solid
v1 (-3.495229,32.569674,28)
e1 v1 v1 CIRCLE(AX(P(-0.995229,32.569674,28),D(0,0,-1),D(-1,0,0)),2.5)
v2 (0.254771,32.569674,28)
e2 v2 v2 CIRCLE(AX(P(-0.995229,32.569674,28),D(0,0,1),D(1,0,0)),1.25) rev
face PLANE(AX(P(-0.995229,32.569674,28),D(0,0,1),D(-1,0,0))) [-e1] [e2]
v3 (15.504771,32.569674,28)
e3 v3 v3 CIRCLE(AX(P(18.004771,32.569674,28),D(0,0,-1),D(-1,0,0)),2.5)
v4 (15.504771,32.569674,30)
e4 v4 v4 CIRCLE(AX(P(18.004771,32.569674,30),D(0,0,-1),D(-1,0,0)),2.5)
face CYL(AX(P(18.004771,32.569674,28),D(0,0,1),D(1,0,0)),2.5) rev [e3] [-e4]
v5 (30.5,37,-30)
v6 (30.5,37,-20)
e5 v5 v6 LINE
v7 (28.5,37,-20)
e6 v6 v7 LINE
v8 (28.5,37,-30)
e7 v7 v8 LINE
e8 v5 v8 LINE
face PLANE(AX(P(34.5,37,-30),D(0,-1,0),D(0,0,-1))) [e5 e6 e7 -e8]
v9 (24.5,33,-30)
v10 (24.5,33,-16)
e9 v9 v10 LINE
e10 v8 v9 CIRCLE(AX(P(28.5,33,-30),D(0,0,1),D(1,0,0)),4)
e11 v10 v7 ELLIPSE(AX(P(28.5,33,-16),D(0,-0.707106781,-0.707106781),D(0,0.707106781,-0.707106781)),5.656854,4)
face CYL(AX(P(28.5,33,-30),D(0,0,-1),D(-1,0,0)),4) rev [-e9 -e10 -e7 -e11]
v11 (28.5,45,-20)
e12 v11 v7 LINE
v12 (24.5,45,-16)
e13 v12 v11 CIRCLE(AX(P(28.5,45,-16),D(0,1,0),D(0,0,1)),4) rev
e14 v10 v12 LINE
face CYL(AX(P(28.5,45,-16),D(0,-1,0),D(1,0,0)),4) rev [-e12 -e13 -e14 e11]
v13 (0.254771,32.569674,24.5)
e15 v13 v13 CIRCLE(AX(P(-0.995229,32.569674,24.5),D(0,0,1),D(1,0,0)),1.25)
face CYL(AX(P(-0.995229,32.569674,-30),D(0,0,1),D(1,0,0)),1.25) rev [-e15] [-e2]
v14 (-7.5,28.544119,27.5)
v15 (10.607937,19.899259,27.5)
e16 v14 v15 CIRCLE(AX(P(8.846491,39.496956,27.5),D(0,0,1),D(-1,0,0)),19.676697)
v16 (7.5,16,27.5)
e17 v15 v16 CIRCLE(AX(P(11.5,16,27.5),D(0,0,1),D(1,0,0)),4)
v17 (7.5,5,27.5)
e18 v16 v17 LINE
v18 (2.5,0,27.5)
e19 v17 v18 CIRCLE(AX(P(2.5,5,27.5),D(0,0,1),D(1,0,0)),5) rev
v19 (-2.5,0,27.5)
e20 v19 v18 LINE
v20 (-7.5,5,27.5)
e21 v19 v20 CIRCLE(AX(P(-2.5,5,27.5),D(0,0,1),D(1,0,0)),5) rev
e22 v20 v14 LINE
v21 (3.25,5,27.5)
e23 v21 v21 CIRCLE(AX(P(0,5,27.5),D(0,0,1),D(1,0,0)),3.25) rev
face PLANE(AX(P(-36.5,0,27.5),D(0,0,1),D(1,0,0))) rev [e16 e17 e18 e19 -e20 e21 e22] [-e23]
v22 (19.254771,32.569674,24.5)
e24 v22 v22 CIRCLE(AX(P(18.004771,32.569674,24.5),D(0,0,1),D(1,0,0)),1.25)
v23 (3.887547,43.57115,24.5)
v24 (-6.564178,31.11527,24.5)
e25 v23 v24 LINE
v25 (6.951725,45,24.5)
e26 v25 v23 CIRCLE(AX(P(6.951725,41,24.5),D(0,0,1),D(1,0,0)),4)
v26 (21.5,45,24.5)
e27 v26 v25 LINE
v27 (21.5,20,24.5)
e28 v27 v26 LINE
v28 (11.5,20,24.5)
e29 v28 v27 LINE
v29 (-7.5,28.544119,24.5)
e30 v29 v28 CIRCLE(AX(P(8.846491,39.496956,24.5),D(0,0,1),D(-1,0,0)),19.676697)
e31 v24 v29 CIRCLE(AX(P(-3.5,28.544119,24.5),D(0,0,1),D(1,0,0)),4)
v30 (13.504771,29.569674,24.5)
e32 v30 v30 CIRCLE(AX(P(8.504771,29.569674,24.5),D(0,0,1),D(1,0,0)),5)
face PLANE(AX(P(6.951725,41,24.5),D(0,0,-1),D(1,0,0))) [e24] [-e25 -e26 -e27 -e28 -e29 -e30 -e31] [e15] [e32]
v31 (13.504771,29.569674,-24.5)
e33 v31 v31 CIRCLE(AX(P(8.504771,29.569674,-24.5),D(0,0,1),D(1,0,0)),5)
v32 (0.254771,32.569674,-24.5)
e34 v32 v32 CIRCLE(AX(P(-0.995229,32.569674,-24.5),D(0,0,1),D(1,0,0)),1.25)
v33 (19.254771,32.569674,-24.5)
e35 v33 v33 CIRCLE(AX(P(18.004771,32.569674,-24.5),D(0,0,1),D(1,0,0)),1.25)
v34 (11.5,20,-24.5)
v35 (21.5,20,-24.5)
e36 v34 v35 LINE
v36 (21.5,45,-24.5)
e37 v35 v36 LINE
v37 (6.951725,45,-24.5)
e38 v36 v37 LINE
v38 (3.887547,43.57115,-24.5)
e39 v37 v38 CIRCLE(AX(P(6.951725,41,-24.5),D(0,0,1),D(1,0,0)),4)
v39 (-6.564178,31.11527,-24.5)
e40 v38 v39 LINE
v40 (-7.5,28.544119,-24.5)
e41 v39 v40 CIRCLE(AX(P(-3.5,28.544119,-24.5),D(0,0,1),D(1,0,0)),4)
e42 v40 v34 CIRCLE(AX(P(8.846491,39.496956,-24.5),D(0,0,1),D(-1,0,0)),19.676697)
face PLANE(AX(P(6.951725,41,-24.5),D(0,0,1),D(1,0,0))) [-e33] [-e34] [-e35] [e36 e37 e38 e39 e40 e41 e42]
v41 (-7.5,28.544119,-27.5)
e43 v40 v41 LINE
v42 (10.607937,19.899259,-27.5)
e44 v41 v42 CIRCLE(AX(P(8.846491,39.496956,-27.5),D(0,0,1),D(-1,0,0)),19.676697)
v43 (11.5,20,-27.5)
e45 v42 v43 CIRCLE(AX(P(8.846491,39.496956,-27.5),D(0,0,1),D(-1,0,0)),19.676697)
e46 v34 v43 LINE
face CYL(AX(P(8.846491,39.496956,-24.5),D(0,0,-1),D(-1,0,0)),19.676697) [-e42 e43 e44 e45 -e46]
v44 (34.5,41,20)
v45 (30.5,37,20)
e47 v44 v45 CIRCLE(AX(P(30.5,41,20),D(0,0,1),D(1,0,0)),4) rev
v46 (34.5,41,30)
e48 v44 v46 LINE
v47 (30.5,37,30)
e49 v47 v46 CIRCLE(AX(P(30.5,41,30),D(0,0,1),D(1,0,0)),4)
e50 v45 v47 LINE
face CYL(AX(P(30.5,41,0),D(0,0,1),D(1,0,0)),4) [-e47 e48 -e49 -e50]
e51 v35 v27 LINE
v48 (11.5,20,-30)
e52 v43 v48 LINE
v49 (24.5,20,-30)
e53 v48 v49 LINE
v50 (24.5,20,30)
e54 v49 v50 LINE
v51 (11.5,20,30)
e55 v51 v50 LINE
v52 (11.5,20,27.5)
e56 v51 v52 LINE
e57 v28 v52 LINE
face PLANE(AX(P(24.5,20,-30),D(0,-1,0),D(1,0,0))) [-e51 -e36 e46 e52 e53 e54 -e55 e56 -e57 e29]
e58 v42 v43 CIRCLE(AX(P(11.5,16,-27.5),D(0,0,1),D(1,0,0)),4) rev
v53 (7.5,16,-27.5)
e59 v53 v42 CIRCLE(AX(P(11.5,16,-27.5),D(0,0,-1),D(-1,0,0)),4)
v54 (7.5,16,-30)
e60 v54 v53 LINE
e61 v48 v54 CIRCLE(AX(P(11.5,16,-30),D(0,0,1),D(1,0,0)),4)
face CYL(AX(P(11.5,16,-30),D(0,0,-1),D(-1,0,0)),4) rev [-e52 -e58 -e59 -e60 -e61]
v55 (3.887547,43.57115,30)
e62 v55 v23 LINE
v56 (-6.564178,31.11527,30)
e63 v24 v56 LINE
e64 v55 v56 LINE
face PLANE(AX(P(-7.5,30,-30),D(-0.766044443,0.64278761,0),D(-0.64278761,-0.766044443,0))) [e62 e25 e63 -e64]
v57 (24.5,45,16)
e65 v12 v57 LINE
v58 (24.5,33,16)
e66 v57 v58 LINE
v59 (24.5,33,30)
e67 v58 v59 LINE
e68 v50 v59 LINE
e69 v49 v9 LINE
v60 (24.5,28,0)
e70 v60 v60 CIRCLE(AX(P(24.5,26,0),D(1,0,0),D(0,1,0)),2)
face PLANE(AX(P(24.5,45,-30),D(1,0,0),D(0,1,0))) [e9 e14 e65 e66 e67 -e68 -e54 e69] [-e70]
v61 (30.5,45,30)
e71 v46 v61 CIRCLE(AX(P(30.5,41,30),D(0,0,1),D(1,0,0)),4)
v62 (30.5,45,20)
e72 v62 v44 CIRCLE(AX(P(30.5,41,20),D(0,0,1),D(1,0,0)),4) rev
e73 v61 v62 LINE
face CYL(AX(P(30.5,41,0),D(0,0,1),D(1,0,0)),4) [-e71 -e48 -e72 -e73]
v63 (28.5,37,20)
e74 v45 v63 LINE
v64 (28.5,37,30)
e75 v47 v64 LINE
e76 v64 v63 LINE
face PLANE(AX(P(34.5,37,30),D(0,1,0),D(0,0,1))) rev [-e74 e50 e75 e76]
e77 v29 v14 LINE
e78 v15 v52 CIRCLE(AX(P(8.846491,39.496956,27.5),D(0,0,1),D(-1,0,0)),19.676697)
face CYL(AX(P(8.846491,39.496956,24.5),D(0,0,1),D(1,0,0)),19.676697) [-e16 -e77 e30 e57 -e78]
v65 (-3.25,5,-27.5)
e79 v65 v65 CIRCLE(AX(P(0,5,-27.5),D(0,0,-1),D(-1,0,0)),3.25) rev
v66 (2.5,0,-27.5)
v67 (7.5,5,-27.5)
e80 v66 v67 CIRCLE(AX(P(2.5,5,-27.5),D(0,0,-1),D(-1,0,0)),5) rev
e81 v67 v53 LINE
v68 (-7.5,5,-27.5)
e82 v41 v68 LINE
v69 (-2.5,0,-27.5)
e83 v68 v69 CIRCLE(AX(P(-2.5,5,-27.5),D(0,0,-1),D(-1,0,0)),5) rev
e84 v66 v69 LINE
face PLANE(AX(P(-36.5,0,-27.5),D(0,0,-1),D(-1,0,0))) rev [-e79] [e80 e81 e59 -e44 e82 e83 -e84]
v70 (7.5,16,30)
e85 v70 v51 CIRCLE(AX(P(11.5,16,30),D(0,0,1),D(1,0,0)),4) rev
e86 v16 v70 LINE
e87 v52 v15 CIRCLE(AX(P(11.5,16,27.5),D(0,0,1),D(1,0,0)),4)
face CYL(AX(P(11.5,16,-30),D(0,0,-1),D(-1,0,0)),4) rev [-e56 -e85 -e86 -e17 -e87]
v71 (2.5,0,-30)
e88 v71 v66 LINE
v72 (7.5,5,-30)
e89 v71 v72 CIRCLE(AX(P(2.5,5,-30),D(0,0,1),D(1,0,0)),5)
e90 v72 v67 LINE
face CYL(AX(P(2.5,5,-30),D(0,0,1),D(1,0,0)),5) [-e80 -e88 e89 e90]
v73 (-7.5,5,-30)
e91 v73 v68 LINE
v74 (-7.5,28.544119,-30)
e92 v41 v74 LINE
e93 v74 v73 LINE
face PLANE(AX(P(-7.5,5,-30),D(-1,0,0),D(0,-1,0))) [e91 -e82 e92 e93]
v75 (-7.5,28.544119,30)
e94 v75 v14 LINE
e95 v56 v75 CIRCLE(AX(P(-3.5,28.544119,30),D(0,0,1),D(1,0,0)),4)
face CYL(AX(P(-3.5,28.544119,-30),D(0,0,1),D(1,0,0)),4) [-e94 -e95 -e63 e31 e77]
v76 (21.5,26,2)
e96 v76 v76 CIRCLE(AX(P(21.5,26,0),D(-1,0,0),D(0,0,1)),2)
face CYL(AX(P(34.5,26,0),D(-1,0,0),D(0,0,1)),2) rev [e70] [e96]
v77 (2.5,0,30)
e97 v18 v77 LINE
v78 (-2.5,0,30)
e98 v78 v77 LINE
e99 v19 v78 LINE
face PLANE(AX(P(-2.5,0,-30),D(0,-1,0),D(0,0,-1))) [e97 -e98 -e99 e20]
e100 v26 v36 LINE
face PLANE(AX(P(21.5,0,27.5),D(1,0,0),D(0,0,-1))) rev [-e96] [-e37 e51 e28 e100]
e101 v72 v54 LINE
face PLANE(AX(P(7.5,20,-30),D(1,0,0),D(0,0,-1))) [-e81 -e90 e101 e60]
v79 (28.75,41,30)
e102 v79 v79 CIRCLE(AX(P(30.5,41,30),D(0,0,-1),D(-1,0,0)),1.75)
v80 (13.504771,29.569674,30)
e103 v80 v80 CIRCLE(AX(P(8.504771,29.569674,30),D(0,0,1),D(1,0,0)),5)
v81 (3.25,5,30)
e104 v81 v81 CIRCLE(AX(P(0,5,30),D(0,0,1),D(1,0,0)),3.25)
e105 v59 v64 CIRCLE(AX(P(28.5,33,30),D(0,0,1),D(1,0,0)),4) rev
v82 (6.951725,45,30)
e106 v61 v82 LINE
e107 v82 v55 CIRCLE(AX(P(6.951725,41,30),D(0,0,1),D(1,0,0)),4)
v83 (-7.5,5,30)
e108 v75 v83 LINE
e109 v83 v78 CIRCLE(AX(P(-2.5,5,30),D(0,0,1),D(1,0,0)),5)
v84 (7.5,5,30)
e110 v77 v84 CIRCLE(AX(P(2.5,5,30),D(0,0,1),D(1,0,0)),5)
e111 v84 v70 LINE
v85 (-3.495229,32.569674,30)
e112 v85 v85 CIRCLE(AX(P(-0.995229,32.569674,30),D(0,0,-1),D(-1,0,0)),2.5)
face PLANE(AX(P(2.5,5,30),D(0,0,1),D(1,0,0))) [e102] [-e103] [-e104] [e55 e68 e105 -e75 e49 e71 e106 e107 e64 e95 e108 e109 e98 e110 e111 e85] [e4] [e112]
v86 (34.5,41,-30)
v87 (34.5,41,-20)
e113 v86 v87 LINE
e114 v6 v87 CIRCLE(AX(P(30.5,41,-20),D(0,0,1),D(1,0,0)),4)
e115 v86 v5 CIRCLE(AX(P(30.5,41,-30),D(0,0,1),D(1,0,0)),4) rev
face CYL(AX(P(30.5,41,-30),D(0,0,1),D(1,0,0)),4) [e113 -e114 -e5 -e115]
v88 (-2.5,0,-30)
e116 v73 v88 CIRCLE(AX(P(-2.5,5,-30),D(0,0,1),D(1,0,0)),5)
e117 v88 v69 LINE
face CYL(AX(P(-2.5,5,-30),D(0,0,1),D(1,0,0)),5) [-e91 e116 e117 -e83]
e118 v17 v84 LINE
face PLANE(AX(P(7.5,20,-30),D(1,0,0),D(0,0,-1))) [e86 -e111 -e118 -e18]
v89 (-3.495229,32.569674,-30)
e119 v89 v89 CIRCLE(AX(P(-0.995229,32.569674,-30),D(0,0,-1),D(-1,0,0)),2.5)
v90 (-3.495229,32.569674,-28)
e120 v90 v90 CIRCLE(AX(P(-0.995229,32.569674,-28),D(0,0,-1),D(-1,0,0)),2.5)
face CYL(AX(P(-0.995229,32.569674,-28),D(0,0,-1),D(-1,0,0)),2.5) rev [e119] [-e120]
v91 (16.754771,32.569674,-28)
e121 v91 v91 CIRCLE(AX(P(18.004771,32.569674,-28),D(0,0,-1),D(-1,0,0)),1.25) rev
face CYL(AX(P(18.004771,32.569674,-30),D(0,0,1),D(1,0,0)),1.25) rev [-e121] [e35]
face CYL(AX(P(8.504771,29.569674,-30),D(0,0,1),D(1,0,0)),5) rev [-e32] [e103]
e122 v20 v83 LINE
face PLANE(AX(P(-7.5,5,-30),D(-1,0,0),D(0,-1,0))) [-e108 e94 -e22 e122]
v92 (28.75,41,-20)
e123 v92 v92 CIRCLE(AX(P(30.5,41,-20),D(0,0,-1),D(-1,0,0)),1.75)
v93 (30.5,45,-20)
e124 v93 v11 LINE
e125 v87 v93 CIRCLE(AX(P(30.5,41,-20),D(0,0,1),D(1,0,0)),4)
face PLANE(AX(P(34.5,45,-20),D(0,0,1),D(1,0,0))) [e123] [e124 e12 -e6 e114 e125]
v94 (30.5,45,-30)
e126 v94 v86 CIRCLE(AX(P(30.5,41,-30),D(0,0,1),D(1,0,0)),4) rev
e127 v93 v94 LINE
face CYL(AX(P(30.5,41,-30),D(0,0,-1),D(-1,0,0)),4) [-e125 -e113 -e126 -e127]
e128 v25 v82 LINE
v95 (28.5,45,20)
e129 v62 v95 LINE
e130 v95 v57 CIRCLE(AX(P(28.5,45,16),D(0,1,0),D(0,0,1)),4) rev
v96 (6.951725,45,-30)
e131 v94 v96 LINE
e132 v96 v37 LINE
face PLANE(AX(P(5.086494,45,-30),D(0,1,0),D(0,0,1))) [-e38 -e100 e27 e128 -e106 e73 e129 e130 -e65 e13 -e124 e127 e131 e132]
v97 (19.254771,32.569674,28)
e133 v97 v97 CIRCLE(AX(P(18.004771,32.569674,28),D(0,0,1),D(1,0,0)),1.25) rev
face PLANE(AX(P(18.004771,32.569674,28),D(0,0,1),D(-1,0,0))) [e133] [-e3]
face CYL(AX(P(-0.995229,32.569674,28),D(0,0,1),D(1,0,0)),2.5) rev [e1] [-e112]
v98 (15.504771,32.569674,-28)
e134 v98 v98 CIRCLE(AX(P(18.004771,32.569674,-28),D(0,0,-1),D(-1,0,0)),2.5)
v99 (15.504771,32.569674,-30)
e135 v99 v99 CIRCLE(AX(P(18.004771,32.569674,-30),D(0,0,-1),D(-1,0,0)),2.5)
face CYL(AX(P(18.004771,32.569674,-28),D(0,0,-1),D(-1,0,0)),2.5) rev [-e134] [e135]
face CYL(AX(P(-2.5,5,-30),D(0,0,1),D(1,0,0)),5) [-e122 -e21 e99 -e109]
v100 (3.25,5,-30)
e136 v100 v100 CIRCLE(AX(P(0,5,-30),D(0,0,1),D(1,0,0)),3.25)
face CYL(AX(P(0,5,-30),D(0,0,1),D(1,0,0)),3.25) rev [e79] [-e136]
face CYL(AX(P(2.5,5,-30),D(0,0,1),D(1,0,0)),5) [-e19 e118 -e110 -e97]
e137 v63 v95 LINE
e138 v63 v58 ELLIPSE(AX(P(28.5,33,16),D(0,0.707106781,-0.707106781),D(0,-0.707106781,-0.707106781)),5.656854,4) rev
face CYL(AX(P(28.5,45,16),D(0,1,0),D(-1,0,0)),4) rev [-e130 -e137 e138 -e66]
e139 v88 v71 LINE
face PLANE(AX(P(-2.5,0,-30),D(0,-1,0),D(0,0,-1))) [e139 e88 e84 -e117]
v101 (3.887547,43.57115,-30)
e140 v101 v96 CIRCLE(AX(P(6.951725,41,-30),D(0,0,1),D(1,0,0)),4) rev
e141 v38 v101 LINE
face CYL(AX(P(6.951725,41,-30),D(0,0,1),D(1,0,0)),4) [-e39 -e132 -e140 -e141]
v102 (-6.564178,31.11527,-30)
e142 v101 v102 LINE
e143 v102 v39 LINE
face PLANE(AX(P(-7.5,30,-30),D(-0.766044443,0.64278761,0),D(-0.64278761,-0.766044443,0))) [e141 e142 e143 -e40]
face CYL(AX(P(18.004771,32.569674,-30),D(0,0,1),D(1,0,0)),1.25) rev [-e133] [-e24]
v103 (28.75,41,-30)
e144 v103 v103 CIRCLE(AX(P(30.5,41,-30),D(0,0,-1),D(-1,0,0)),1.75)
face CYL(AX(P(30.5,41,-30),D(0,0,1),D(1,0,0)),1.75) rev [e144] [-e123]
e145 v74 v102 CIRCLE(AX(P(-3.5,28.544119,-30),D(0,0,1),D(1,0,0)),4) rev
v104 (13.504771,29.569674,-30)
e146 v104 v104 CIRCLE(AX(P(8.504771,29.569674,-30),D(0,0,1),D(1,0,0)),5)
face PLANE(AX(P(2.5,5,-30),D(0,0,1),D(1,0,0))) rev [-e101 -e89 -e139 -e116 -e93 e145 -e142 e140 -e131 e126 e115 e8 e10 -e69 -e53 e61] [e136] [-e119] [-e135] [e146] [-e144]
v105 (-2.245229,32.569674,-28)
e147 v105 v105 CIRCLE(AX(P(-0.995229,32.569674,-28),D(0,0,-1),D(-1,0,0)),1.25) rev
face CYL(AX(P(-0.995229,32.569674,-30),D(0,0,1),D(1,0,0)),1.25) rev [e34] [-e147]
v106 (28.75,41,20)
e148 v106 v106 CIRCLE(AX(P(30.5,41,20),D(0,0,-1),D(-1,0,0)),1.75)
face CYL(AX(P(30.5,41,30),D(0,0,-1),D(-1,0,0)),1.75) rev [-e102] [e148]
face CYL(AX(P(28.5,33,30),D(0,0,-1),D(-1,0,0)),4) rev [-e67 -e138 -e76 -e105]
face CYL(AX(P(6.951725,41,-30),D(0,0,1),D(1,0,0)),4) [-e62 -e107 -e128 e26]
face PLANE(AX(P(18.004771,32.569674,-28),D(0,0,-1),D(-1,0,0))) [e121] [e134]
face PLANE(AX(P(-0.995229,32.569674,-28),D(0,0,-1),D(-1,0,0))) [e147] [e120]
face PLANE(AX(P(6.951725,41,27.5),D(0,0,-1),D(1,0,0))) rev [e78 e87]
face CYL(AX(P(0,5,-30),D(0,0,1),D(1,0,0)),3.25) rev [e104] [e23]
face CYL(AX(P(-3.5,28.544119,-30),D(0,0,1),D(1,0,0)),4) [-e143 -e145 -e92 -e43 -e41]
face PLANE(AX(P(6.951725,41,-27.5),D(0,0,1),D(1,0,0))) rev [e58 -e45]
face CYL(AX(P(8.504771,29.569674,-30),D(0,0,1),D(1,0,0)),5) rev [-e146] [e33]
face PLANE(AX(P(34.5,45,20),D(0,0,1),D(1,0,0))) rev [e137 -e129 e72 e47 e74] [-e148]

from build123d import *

# Parameters (mm, degrees)
BOSS_EXTRUDE1_DEPTH      = 30
BOSS_EXTRUDE1_DEPTH_BACK = 30
SKETCH2_R                = 3.25
SKETCH2_R_2              = 1.25
SKETCH2_R_3              = 5
SKETCH3_W                = 58
SKETCH3_H                = 55
CUT_EXTRUDE1_DEPTH       = 60.373815778
SKETCH4_W                = 10
SKETCH4_H                = 8
BOSS_EXTRUDE2_DEPTH      = 10
FILLET1_R                = 4
SKETCH5_R                = 1.75
CUT_EXTRUDE2_DEPTH       = 76.599272483
FILLET1_OF_MIRROR1_R     = 4
FILLET2_R                = 4
SKETCH6_R                = 1.25
SKETCH6_R_2              = 5
BOSS_EXTRUDE3_DEPTH      = 3
SKETCH7_R                = 2.5
CUT_EXTRUDE3_DEPTH       = 2
SKETCH8_R                = 2
CUT_EXTRUDE4_DEPTH       = 62.36774397


with BuildPart() as part:
    # Sketch2 → Boss-Extrude1 (new, two sides: drawn at the far end of the back side and taken through both)
    with BuildSketch(Plane.XY.offset(-BOSS_EXTRUDE1_DEPTH_BACK)):
        with BuildLine():
            Line((-7.5, 5), (-7.5, 30))
            Line((-7.5, 30), (5.086494468, 45))
            Line((5.086494468, 45), (24.5, 45))
            Line((24.5, 45), (24.5, 20))
            Line((24.5, 20), (7.5, 20))
            Line((7.5, 20), (7.5, 5))
            ThreePointArc((7.5, 5), (6.035533906, 1.464466094), (2.5, 0))
            Line((2.5, 0), (-2.5, 0))
            ThreePointArc((-2.5, 0), (-6.035533906, 1.464466094), (-7.5, 5))
        make_face()
        with Locations((0, 5)):
            Circle(SKETCH2_R, mode=Mode.SUBTRACT)
        with Locations((18.004770913, 32.569673822)):
            Circle(SKETCH2_R_2, mode=Mode.SUBTRACT)
        with Locations((-0.995229087, 32.569673822)):
            Circle(SKETCH2_R_2, mode=Mode.SUBTRACT)
        with Locations((8.504770913, 29.569673822)):
            Circle(SKETCH2_R_3, mode=Mode.SUBTRACT)
    extrude(amount=BOSS_EXTRUDE1_DEPTH + BOSS_EXTRUDE1_DEPTH_BACK)

    # Sketch3 → Cut-Extrude1 (cut, through all)
    with BuildSketch(Plane(origin=(0, 45, 0), x_dir=(1, 0, 0), z_dir=(0, 1, 0))):
        with Locations((-7.5, 0)):
            Rectangle(SKETCH3_W, SKETCH3_H)
    extrude(amount=-CUT_EXTRUDE1_DEPTH, mode=Mode.SUBTRACT)

    # Sketch4 → Boss-Extrude2 (add)
    with BuildSketch(Plane(origin=(24.5, 0, 0), x_dir=(0, 0, -1), z_dir=(1, 0, 0))):
        with Locations((-25, 41)):
            Rectangle(SKETCH4_W, SKETCH4_H)
    boss_extrude2 = extrude(amount=BOSS_EXTRUDE2_DEPTH)

    # Fillet1
    fillet1_edges = [part.edges().sort_by_distance(p)[0] for p in [
        (34.5, 37, 25),
        (34.5, 45, 25),
    ]]
    fillet(fillet1_edges, radius=FILLET1_R - 0.0001)  # a hair under: the kernel refuses the full size

    # Sketch5 → Cut-Extrude2 (cut, through all)
    with BuildSketch(Plane(origin=(0, 0, 20), x_dir=(-1, 0, 0), z_dir=(0, 0, -1))):
        with Locations((-30.5, 41)):
            Circle(SKETCH5_R)
    cut_extrude2 = extrude(amount=-CUT_EXTRUDE2_DEPTH, mode=Mode.SUBTRACT)

    # Mirror1: Boss-Extrude2, Cut-Extrude2 across plane
    add(boss_extrude2.mirror(Plane.XY))
    add(cut_extrude2.mirror(Plane.XY), mode=Mode.SUBTRACT)

    # Fillet1 of Mirror1
    fillet1_of_mirror1_edges = [part.edges().sort_by_distance(p)[0] for p in [
        (34.5, 37, -25),
        (34.5, 45, -25),
    ]]
    fillet(fillet1_of_mirror1_edges, radius=FILLET1_OF_MIRROR1_R - 0.0001)  # a hair under: the kernel refuses the full size

    # Fillet2
    fillet2_edges = [part.edges().sort_by_distance(p)[0] for p in [
        (24.5, 37, 25),
        (24.5, 41, 20),
        (24.5, 37, -25),
        (24.5, 41, -20),
        (5.086494468, 45, -28.75),
        (7.5, 20, -28.75),
        (-7.5, 30, -28.75),
        (-7.5, 30, 28.75),
        (7.5, 20, 28.75),
        (5.086494468, 45, 28.75),
    ]]
    fillet(fillet2_edges, radius=FILLET2_R)

    # Sketch6 → Boss-Extrude3 (add)
    with BuildSketch(Plane.XY.offset(-27.5)):
        with BuildLine():
            Line((21.5, 45), (6.9517251, 45))
            ThreePointArc((6.9517251, 45), (5.261252053, 44.625231148), (3.887547328, 43.571150439))
            Line((3.887547328, 43.571150439), (-6.564177772, 31.115269502))
            ThreePointArc((-6.564177772, 31.115269502), (-7.258770483, 29.912199636), (-7.5, 28.544119063))
            ThreePointArc((-7.5, 28.544119063), (0.776489044, 21.551274863), (11.5, 20))
            Line((11.5, 20), (21.5, 20))
            Line((21.5, 20), (21.5, 45))
        make_face()
        with Locations((18.004770913, 32.569673822)):
            Circle(SKETCH6_R, mode=Mode.SUBTRACT)
        with Locations((8.504770913, 29.569673822)):
            Circle(SKETCH6_R_2, mode=Mode.SUBTRACT)
        with Locations((-0.995229087, 32.569673822)):
            Circle(SKETCH6_R, mode=Mode.SUBTRACT)
    boss_extrude3 = extrude(amount=BOSS_EXTRUDE3_DEPTH)

    # Sketch7 → Cut-Extrude3 (cut)
    with BuildSketch(Plane(origin=(0, 0, -30), x_dir=(-1, 0, 0), z_dir=(0, 0, -1))):
        with Locations((-18.004770913, 32.569673822)):
            Circle(SKETCH7_R)
        with Locations((0.995229087, 32.569673822)):
            Circle(SKETCH7_R)
    cut_extrude3 = extrude(amount=-CUT_EXTRUDE3_DEPTH, mode=Mode.SUBTRACT)

    # Mirror2: Boss-Extrude3, Cut-Extrude3 across plane
    add(boss_extrude3.mirror(Plane.XY))
    add(cut_extrude3.mirror(Plane.XY), mode=Mode.SUBTRACT)

    # Sketch8 → Cut-Extrude4 (cut, through all)
    with BuildSketch(Plane.ZY.offset(-21.5)):
        with Locations((0, 26)):
            Circle(SKETCH8_R)
    extrude(amount=-CUT_EXTRUDE4_DEPTH, mode=Mode.SUBTRACT)


solid = part.part
